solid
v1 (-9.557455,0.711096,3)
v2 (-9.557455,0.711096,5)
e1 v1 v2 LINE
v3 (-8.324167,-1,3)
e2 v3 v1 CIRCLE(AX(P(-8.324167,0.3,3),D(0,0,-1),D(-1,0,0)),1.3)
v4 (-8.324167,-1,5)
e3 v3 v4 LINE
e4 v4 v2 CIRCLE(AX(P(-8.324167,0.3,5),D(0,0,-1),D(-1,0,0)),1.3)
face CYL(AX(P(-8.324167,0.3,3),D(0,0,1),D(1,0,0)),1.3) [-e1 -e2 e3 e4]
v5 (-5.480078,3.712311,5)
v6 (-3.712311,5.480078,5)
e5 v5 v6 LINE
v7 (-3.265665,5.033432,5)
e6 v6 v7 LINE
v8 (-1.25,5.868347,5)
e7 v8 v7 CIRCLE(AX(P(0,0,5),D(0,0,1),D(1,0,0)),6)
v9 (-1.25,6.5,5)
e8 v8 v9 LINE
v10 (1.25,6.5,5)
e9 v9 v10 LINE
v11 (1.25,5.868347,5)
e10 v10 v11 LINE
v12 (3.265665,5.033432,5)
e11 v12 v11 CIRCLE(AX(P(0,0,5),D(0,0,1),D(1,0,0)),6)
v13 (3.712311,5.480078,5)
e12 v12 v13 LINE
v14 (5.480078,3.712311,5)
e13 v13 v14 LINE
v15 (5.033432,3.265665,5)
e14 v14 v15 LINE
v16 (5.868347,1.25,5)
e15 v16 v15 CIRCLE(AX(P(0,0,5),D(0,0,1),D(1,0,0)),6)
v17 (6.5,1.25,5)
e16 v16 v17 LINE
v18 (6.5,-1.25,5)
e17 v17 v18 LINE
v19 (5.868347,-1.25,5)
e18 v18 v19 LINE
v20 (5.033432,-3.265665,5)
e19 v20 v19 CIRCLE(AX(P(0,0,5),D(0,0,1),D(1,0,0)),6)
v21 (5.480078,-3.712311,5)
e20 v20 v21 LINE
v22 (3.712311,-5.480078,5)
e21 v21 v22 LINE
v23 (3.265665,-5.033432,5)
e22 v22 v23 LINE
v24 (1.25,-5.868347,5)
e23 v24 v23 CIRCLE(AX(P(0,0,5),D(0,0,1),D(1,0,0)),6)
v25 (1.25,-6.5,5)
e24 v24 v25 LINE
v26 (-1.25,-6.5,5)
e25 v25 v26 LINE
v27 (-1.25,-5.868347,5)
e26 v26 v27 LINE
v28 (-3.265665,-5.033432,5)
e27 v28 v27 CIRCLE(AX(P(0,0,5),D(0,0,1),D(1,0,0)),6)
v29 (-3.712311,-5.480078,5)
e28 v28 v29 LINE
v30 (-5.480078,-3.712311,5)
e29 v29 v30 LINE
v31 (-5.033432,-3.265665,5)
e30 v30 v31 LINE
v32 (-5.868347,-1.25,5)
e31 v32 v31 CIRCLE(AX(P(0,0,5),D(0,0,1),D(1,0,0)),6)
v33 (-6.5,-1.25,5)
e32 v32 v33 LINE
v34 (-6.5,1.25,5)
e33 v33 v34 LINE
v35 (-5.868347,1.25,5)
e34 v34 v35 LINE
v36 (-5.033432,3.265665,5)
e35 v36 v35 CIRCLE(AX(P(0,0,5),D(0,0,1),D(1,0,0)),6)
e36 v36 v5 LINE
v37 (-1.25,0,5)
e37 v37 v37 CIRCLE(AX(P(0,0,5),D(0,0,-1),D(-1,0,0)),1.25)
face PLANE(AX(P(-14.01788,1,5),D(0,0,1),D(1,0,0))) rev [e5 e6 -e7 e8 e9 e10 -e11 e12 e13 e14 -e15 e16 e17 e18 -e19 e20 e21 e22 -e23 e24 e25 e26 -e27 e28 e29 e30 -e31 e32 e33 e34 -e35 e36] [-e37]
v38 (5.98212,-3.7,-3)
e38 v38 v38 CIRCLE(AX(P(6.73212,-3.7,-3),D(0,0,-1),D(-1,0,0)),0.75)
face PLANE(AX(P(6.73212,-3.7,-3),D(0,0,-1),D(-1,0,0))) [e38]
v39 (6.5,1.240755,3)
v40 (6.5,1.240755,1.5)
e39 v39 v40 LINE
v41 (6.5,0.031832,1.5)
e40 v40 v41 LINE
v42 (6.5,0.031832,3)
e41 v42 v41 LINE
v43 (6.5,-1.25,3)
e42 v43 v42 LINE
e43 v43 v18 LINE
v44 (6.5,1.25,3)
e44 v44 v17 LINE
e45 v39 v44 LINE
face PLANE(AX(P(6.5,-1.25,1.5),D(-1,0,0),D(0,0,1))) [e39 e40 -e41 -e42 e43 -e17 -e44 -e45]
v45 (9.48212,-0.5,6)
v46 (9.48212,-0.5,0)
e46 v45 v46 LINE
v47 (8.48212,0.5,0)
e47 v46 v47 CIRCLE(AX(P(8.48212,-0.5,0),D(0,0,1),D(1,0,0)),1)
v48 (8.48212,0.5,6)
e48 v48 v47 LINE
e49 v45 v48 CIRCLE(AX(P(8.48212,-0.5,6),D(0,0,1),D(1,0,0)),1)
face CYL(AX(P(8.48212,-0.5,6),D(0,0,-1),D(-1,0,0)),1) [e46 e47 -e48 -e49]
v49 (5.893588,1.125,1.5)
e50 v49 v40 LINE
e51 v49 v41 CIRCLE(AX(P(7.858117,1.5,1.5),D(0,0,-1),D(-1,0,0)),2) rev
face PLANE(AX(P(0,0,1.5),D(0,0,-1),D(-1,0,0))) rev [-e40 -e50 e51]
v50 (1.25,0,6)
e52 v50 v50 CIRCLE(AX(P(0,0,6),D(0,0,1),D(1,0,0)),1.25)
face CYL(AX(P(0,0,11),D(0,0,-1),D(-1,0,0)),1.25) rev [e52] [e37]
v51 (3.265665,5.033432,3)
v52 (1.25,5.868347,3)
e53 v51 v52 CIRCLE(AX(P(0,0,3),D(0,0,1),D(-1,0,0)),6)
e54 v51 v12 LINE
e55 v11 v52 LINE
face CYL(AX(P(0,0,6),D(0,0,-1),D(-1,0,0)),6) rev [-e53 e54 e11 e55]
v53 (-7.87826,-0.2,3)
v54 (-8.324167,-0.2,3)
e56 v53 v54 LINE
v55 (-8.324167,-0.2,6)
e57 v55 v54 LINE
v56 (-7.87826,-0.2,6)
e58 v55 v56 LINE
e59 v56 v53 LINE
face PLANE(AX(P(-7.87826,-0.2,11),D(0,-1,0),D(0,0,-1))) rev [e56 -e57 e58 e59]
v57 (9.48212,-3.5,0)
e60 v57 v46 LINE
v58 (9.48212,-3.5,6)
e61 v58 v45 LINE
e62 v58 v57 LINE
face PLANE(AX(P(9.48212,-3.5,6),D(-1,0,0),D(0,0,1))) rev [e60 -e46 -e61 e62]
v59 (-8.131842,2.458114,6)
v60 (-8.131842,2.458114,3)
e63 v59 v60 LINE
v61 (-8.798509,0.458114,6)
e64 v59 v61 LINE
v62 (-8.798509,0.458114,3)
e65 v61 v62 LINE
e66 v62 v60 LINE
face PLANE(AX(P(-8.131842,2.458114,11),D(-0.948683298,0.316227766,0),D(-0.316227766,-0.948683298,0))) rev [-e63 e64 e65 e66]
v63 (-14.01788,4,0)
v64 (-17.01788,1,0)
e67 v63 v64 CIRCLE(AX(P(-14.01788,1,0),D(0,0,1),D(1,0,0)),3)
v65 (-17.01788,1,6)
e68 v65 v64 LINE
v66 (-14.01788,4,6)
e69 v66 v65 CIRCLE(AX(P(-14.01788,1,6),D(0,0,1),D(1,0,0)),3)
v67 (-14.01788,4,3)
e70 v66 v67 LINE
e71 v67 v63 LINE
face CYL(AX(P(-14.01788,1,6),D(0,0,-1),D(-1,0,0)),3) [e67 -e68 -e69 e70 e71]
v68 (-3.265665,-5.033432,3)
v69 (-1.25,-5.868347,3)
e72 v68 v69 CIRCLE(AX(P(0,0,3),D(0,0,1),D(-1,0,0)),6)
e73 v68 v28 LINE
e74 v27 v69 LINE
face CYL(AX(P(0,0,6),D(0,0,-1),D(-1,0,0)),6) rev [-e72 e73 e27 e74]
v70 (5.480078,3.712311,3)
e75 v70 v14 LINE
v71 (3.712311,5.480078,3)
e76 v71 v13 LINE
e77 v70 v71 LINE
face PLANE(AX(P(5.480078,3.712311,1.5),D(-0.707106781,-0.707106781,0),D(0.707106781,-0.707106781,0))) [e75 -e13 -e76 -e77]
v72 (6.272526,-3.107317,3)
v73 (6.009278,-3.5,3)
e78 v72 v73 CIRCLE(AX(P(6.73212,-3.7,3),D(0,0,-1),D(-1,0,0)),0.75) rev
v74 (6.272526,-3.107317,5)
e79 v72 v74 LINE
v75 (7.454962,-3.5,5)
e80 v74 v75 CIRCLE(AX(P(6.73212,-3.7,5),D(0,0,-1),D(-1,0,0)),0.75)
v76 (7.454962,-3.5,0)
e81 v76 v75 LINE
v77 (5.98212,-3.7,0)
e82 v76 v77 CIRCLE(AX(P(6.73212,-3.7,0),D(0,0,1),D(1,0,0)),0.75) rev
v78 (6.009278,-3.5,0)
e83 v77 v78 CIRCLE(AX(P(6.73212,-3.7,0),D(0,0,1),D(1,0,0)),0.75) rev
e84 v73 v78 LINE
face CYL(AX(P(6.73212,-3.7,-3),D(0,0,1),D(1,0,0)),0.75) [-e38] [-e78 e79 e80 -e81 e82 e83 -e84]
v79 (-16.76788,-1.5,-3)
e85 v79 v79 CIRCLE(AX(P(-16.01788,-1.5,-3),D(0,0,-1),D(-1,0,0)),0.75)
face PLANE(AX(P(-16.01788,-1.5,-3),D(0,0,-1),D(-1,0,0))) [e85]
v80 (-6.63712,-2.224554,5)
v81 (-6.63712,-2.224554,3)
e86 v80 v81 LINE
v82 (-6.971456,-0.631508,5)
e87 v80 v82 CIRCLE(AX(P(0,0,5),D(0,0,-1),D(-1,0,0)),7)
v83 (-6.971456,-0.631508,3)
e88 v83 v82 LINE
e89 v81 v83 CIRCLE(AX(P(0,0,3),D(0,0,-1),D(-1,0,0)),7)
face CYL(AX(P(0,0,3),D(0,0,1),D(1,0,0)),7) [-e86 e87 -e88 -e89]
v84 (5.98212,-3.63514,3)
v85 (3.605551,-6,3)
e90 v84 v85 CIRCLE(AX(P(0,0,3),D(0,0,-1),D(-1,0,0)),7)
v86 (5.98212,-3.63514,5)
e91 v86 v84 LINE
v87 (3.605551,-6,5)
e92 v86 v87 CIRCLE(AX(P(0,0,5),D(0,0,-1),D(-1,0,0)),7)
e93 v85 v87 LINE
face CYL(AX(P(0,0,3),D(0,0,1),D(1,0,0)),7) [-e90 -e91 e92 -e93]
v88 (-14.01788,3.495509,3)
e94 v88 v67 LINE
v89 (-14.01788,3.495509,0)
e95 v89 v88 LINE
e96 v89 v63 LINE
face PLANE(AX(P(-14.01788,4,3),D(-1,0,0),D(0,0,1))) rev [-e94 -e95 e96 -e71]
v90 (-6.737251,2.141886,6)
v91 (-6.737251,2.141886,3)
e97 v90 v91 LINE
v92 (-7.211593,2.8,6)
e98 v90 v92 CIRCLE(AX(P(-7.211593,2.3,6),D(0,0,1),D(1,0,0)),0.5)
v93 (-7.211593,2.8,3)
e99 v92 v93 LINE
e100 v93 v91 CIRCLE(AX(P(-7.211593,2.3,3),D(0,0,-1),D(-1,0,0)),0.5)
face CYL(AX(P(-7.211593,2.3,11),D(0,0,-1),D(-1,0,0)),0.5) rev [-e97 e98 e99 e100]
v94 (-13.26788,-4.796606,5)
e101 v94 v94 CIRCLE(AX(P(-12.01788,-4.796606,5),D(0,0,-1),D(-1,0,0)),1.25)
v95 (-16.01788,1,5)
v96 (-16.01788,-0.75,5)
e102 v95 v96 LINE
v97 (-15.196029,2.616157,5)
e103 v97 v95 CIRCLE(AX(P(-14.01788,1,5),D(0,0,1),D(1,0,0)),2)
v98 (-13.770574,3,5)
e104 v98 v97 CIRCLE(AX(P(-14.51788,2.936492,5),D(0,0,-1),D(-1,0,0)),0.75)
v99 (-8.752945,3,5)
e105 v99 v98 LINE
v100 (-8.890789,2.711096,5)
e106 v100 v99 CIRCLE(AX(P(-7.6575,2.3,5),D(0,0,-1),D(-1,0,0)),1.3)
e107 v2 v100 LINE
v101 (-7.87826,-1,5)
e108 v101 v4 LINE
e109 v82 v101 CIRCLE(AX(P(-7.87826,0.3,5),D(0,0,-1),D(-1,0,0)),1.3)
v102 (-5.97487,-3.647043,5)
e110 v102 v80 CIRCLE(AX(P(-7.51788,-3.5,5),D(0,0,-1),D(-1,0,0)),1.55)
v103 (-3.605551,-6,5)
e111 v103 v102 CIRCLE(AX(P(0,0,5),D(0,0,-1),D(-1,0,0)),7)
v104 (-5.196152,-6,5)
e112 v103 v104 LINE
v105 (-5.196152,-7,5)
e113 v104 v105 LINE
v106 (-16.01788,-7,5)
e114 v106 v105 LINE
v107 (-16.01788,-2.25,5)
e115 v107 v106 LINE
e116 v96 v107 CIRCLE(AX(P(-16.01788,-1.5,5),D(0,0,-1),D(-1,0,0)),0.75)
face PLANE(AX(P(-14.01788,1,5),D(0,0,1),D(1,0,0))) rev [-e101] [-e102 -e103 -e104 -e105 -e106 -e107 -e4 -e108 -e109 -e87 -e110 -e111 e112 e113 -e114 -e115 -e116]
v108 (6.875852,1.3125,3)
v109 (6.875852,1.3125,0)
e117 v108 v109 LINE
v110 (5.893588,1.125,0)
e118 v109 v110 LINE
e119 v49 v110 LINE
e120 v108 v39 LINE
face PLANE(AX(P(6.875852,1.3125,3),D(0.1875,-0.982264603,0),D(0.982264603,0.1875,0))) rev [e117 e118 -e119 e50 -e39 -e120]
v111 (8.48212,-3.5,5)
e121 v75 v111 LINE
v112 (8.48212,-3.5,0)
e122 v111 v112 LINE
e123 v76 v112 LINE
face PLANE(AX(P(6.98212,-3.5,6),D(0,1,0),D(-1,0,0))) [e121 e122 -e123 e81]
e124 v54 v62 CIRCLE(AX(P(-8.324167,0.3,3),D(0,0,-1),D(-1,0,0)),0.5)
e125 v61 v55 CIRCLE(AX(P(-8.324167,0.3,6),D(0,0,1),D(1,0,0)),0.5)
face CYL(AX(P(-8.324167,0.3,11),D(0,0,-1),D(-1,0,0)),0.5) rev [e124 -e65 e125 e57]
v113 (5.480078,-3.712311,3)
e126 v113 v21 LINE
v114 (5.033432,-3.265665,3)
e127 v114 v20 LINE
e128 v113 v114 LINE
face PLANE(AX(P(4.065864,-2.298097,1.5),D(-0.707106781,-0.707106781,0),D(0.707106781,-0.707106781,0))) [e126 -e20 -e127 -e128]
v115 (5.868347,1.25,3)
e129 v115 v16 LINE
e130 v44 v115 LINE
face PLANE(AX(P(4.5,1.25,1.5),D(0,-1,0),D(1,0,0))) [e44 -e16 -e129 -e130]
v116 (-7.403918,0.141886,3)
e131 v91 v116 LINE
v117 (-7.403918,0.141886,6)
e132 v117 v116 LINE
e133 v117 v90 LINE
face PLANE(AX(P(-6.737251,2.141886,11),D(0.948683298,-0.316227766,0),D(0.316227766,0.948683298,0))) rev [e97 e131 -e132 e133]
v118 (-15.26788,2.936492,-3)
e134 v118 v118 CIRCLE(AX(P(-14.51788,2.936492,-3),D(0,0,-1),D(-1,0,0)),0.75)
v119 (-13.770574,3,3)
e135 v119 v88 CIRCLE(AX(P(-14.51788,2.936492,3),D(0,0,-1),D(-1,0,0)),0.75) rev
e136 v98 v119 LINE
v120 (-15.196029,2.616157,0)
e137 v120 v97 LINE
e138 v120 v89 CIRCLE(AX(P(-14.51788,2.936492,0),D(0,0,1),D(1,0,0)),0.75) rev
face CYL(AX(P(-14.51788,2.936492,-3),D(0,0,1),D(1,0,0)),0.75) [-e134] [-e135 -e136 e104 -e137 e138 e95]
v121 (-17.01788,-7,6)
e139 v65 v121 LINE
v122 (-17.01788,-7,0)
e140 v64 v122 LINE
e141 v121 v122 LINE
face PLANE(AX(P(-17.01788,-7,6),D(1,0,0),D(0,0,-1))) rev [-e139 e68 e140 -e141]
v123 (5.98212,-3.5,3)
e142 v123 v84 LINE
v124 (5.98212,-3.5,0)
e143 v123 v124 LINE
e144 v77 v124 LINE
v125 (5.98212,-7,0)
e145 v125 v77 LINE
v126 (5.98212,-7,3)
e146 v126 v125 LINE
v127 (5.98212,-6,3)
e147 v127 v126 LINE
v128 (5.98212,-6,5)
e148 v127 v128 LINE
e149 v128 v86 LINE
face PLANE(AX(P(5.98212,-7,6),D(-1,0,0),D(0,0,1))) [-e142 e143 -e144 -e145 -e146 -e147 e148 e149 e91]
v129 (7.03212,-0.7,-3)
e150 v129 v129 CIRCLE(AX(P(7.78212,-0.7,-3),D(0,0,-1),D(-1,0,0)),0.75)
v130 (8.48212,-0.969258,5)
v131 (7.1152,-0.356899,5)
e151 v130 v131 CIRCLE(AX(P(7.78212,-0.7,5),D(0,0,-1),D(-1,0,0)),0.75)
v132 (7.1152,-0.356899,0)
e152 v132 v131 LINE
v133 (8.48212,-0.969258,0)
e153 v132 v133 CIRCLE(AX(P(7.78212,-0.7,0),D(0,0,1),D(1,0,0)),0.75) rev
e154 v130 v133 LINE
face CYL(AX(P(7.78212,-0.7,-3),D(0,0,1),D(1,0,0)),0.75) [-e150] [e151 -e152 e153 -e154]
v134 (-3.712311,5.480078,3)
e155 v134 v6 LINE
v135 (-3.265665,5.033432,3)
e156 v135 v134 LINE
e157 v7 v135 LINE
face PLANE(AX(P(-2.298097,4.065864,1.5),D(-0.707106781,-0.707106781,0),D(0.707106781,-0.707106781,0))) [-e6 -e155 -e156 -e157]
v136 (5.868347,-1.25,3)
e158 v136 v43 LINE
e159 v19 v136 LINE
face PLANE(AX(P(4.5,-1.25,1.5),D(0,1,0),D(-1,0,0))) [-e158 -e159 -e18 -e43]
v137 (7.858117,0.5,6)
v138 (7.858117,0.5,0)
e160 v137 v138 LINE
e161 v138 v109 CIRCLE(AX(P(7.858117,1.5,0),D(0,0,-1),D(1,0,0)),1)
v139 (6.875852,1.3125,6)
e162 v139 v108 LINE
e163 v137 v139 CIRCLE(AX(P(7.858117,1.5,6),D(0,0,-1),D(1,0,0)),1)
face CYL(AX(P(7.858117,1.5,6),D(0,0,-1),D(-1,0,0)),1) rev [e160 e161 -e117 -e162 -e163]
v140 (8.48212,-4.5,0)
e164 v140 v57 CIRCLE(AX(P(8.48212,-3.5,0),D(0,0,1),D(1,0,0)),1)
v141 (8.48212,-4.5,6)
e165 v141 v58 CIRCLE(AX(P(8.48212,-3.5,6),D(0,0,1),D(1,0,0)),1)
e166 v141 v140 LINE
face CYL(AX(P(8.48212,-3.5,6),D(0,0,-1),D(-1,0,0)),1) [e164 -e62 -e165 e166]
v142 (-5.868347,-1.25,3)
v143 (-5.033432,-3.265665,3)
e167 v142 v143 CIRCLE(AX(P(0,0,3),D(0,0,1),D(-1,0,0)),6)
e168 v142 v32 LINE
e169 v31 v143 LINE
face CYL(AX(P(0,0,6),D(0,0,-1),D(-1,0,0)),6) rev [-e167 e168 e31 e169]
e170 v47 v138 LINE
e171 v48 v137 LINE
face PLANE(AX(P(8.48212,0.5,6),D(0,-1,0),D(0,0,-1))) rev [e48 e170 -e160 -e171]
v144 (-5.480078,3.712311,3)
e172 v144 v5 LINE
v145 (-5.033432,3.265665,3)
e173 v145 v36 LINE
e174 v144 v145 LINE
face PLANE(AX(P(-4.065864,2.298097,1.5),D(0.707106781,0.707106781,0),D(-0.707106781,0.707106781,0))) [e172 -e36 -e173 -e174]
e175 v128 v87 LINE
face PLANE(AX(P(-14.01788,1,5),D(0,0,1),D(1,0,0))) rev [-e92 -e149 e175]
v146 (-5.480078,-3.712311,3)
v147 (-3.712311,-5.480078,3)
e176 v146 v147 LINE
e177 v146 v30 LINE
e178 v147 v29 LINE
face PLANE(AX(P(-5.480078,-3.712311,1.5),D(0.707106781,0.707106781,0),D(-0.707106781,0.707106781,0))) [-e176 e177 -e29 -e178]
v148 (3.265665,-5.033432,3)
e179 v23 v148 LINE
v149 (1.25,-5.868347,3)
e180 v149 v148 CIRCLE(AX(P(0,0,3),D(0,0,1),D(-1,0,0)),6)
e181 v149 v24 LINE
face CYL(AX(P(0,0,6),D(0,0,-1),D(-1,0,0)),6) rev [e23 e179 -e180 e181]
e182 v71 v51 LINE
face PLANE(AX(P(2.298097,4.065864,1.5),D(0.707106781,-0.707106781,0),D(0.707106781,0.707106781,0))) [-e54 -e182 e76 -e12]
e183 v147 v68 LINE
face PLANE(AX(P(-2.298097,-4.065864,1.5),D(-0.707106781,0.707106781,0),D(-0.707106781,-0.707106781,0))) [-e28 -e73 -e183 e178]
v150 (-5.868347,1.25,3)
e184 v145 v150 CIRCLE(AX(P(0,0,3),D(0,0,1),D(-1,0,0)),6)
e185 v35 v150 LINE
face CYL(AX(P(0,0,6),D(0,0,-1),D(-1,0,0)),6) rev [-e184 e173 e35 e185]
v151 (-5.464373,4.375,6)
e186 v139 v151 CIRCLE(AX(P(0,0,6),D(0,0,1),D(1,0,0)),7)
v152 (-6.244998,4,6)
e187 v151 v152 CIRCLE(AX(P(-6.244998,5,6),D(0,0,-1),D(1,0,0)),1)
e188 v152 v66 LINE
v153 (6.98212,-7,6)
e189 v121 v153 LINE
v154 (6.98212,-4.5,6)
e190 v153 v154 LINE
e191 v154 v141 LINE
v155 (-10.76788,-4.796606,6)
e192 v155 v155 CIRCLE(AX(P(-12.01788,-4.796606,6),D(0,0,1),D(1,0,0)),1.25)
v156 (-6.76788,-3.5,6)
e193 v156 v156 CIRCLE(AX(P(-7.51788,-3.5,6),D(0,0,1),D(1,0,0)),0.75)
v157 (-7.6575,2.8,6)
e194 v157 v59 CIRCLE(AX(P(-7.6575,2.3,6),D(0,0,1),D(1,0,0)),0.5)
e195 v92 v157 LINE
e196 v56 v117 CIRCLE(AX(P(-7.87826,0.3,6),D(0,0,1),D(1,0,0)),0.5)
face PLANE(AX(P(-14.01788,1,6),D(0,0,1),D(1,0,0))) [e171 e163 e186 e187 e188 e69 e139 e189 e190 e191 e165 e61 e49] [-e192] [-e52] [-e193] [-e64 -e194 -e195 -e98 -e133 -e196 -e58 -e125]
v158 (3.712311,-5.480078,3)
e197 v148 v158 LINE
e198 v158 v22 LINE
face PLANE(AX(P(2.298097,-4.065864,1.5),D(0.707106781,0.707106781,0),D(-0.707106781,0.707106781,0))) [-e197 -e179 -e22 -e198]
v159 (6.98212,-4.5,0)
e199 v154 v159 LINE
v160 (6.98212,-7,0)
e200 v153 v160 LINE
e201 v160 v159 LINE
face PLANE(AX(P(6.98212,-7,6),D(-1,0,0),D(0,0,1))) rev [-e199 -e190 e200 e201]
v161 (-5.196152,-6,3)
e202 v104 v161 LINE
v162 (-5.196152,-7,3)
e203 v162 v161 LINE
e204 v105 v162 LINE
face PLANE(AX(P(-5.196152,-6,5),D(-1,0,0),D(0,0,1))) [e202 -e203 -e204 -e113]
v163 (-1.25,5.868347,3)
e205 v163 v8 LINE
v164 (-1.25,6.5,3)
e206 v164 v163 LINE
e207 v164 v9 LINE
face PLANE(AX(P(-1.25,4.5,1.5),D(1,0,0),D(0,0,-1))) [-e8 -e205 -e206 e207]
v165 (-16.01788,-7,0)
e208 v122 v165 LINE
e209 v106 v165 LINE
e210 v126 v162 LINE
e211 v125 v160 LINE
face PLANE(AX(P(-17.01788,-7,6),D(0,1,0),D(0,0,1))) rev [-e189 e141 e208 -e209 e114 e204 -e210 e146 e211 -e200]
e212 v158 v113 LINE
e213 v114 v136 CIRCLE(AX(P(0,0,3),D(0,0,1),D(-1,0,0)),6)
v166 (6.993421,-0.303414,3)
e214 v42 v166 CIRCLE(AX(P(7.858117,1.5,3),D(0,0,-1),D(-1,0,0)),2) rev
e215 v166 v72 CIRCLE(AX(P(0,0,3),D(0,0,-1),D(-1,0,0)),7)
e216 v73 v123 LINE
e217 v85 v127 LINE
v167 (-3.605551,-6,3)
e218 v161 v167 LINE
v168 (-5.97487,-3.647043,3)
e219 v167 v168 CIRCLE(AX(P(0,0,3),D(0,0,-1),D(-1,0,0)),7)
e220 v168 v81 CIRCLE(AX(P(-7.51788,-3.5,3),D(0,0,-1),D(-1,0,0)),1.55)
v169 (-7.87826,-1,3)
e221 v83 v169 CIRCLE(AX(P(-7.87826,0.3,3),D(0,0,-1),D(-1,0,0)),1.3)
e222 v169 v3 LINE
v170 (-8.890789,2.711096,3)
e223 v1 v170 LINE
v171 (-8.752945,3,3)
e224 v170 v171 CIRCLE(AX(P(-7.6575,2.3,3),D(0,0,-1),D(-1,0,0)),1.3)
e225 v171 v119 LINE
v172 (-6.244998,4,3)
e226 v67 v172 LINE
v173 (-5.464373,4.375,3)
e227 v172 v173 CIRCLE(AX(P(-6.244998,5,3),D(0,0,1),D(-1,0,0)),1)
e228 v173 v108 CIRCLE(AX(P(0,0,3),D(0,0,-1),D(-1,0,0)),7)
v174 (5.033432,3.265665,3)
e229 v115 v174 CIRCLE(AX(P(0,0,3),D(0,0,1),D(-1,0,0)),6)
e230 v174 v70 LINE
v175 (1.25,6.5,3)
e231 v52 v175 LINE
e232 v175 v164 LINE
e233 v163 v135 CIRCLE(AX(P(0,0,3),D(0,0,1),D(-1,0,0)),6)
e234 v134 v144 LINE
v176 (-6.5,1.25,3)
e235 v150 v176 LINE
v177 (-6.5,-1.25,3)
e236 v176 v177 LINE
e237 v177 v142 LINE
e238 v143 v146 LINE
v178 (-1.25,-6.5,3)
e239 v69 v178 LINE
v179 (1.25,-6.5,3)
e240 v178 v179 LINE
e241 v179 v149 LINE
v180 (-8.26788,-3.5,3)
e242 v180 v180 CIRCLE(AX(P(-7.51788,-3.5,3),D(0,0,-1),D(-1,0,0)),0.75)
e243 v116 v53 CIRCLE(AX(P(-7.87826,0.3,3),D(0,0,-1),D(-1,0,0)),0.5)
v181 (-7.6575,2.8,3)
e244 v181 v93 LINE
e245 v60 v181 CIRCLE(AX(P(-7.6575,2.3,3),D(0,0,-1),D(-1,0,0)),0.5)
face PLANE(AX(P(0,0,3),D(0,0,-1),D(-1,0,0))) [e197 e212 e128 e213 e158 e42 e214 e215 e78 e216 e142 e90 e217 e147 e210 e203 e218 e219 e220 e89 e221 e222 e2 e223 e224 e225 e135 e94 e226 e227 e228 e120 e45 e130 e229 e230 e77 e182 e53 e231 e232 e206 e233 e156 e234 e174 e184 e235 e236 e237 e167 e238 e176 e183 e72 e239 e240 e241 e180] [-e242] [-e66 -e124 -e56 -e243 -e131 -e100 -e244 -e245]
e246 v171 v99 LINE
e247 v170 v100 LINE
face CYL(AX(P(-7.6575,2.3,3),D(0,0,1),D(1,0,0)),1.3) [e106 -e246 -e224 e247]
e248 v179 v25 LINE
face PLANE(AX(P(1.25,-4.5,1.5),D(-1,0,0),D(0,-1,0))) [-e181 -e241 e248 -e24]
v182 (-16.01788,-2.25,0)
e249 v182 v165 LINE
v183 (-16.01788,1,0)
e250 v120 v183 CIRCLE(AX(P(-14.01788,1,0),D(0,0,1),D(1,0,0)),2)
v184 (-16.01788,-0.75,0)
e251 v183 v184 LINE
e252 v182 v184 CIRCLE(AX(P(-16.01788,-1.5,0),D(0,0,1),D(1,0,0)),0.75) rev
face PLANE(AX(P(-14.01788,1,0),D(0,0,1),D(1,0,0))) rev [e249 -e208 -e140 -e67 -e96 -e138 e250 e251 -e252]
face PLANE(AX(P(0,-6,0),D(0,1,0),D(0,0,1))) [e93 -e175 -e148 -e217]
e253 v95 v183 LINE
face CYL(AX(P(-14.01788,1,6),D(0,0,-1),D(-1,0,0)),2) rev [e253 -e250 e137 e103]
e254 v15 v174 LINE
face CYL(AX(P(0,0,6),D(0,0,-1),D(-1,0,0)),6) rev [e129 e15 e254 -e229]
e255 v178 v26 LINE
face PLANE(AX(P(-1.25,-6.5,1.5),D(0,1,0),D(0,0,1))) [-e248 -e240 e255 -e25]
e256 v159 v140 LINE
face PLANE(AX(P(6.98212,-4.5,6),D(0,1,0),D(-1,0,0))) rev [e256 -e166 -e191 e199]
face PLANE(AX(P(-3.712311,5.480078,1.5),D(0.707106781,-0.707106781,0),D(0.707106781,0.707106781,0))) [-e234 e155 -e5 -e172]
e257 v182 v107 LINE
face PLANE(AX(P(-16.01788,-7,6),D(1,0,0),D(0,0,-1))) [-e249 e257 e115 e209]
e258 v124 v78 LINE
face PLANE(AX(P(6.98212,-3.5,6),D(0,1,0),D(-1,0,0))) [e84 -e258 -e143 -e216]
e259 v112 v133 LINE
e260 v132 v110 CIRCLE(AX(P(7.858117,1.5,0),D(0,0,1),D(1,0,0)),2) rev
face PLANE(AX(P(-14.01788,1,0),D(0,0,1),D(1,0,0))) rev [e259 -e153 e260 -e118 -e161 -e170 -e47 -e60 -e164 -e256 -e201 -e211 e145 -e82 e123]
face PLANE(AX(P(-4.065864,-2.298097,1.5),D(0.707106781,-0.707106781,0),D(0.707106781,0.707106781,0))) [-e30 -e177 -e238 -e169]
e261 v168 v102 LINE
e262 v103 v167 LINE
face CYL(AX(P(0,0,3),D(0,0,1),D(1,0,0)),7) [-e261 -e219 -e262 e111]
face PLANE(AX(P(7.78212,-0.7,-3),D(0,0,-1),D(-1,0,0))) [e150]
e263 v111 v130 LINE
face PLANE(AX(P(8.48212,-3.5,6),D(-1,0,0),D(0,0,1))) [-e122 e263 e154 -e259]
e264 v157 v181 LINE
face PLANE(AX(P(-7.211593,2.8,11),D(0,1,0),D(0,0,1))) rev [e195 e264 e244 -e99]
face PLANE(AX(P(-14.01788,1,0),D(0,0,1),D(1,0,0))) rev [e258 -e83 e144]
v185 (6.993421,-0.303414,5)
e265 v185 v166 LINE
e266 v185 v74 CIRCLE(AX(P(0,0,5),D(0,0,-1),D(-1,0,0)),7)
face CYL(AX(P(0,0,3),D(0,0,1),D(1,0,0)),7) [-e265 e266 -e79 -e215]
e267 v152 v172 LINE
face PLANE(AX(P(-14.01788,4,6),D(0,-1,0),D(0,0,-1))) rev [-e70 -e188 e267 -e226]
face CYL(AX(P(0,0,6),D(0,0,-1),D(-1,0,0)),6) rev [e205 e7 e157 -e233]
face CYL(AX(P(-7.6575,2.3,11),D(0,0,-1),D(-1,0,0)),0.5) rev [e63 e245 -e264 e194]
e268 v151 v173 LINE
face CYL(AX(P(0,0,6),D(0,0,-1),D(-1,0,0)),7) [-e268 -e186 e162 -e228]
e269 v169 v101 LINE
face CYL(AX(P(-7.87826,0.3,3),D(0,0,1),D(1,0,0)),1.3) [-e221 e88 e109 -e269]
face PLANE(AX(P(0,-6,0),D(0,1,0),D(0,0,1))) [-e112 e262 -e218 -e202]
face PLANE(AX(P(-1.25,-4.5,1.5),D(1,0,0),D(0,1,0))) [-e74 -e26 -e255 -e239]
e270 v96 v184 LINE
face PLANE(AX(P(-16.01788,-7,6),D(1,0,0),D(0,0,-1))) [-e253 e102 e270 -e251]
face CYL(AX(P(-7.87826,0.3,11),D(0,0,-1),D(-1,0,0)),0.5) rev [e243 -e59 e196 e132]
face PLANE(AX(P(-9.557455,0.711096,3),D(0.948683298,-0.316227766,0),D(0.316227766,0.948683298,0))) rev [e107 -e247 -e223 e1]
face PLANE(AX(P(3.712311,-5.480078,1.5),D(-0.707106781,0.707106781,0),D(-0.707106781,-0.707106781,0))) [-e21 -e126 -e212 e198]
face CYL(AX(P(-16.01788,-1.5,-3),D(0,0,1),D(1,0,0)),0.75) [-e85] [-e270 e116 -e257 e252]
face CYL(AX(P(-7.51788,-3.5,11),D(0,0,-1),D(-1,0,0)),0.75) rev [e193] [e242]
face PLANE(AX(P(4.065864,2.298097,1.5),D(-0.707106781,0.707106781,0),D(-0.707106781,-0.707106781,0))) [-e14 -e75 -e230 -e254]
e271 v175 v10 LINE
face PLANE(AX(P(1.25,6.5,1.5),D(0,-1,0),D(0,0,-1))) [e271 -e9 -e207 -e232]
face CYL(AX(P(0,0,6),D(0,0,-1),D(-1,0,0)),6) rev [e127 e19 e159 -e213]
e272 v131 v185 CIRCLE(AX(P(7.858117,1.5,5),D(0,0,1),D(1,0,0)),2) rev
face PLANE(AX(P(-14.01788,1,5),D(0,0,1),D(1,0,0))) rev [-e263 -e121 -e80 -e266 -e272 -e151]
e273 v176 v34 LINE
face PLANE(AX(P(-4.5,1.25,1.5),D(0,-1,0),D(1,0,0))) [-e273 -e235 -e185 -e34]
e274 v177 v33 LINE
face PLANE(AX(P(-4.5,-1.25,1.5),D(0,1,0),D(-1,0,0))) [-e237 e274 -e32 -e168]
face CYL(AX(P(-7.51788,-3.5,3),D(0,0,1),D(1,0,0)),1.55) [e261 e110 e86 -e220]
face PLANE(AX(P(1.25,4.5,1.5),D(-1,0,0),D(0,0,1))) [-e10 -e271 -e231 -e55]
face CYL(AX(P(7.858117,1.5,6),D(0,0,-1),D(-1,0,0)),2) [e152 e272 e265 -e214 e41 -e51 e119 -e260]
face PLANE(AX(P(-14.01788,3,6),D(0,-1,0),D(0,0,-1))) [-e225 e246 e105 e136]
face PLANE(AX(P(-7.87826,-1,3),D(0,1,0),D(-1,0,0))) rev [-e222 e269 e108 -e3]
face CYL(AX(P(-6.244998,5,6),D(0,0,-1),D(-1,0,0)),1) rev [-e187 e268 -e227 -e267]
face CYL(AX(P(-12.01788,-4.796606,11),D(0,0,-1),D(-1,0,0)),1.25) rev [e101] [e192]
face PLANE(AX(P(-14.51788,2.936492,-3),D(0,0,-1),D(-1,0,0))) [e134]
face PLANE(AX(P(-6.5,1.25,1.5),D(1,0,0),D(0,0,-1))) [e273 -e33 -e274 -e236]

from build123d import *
from build123d.topology import SkipClean

# Parameters (mm, degrees)
BOSS_EXTRUDE1_DEPTH = 6
SHELL1_DEPTH        = 5
SKETCH2_R           = 1.25
SKETCH2_R_2         = 0.75
CUT_EXTRUDE1_DEPTH  = 6
SKETCH3_W           = 11.178272445
SKETCH3_H           = 3
BOSS_EXTRUDE2_DEPTH = 1
CUT_EXTRUDE2_DEPTH  = 3
BOSS_EXTRUDE4_START = 2
SKETCH7_R           = 7
SKETCH7_R_2         = 6
BOSS_EXTRUDE4_DEPTH = 2
BOSS_EXTRUDE5_START = 2
SKETCH8_R           = 1.55
SKETCH8_R_2         = 0.75
BOSS_EXTRUDE5_DEPTH = 2
SKETCH10_R          = 0.75
BOSS_EXTRUDE6_DEPTH = 8
SKETCH17_W          = 11.178272445
SKETCH17_H          = 1
CUT_EXTRUDE5_DEPTH  = 1
SKETCH18_W          = 2.5
SKETCH18_H          = 2
SKETCH18_W_2        = 2
SKETCH18_H_2        = 2.5
CUT_EXTRUDE7_DEPTH  = 3.5


# Read off the part's stored shape, not the designer's step: Shell1
with BuildPart() as part:
    # Sketch1 → Boss-Extrude1 (new body)
    with BuildSketch(Plane.XY):
        with BuildLine():
            Line((-17.017879978, -7), (6.982120022, -7))
            Line((6.982120022, -7), (6.982120022, -4.5))
            Line((6.982120022, -4.5), (8.482120022, -4.5))
            ThreePointArc((8.482120022, -4.5), (9.189226803, -4.207106781), (9.482120022, -3.5))
            Line((9.482120022, -3.5), (9.482120022, -0.5))
            ThreePointArc((9.482120022, -0.5), (9.189226803, 0.207106781), (8.482120022, 0.5))
            Line((8.482120022, 0.5), (7.858116823, 0.5))
            ThreePointArc((7.858116823, 0.5), (7.220739384, 0.72944825), (6.87585222, 1.3125))
            ThreePointArc((6.87585222, 1.3125), (1.68605895, 6.793909421), (-5.464373249, 4.375))
            ThreePointArc((-5.464373249, 4.375), (-5.811985297, 4.098612181), (-6.244997998, 4))
            Line((-6.244997998, 4), (-14.017879978, 4))
            ThreePointArc((-14.017879978, 4), (-16.139200322, 3.121320344), (-17.017879978, 1))
            Line((-17.017879978, 1), (-17.017879978, -7))
        make_face()
    extrude(amount=BOSS_EXTRUDE1_DEPTH)

    # Shell1 outline → Shell1 (cut)
    with BuildSketch(Plane.XY):
        with BuildLine():
            Line((-16.017879978, 1), (-16.017879978, -7))
            Line((-16.017879978, -7), (5.982120022, -7))
            Line((5.982120022, -7), (5.982120022, -3.5))
            Line((5.982120022, -3.5), (8.482120022, -3.5))
            Line((8.482120022, -3.5), (8.482120022, -0.5))
            Line((8.482120022, -0.5), (7.858116823, -0.5))
            ThreePointArc((7.858116823, -0.5), (6.583361944, -0.041103501), (5.893587617, 1.125))
            ThreePointArc((5.893587617, 1.125), (1.445193386, 5.823350932), (-4.683748499, 3.75))
            ThreePointArc((-4.683748499, 3.75), (-5.378972594, 3.197224362), (-6.244997998, 3))
            Line((-6.244997998, 3), (-14.017879978, 3))
            ThreePointArc((-14.017879978, 3), (-15.43209354, 2.414213562), (-16.017879978, 1))
        make_face()
    extrude(amount=SHELL1_DEPTH, mode=Mode.SUBTRACT)

    # Sketch2 → Cut-Extrude1 (cut)
    with BuildSketch(Plane(origin=(0, 0, 5), x_dir=(-1, 0, 0), z_dir=(0, 0, -1))):
        Circle(SKETCH2_R)
        with Locations((7.517879978, -3.5)):
            Circle(SKETCH2_R_2)
        with Locations((12.017879978, -4.796605976)):
            Circle(SKETCH2_R)
        with BuildLine():
            Line((7.211592921, 2.8), (7.657500368, 2.8))
            ThreePointArc((7.657500368, 2.8), (7.94985551, 2.705621093), (8.131842017, 2.458113883))
            Line((8.131842017, 2.458113883), (8.798508684, 0.458113883))
            ThreePointArc((8.798508684, 0.458113883), (8.729788127, 0.007644858), (8.324167035, -0.2))
            Line((8.324167035, -0.2), (7.878259588, -0.2))
            ThreePointArc((7.878259588, -0.2), (7.585904446, -0.105621093), (7.403917939, 0.141886117))
            Line((7.403917939, 0.141886117), (6.737251272, 2.141886117))
            ThreePointArc((6.737251272, 2.141886117), (6.805971829, 2.592355142), (7.211592921, 2.8))
        make_face()
    extrude(amount=-CUT_EXTRUDE1_DEPTH, mode=Mode.SUBTRACT)

    # Sketch3 → Boss-Extrude2 (add)
    with BuildSketch(Plane.XZ.offset(7)):
        with Locations((0.3929838, 3.5)):
            Rectangle(SKETCH3_W, SKETCH3_H)
    extrude(amount=-BOSS_EXTRUDE2_DEPTH)

    # Sketch6 → Cut-Extrude2 (cut)
    with BuildSketch(Plane(origin=(0, 0, 0), x_dir=(-1, 0, 0), z_dir=(0, 0, -1))):
        with BuildLine():
            Line((6.244997998, 4), (14.017879978, 4))
            Line((14.017879978, 4), (14.017879978, 3))
            Line((14.017879978, 3), (6.244997998, 3))
            ThreePointArc((6.244997998, 3), (5.378972595, 3.197224362), (4.683748499, 3.75))
            ThreePointArc((4.683748499, 3.75), (-1.445193386, 5.823350932), (-5.893587617, 1.125))
            Line((-5.893587617, 1.125), (-6.87585222, 1.3125))
            ThreePointArc((-6.87585222, 1.3125), (-1.68605895, 6.793909421), (5.464373249, 4.375))
            ThreePointArc((5.464373249, 4.375), (5.811985297, 4.098612181), (6.244997998, 4))
        make_face()
    extrude(amount=-CUT_EXTRUDE2_DEPTH, mode=Mode.SUBTRACT)

    # Sketch7 → Boss-Extrude4 (add)
    with SkipClean():  # the faces are left unmerged after this step: merging them gives an invalid solid
        with BuildSketch(Plane(origin=(0, 0, 5), x_dir=(-1, 0, 0), z_dir=(0, 0, -1)).offset(BOSS_EXTRUDE4_START)):
            Circle(SKETCH7_R)
            with Locations(Location((0, 0, 0), (0, 0, 270))):
                Circle(SKETCH7_R_2, mode=Mode.SUBTRACT)
        extrude(amount=-BOSS_EXTRUDE4_DEPTH)

    # Sketch8 → Boss-Extrude5 (add)
    # profile 1 of 2: a face of its own
    with SkipClean():  # the faces are left unmerged after this step: merging them gives an invalid solid
        with BuildSketch(Plane(origin=(0, 0, 5), x_dir=(-1, 0, 0), z_dir=(0, 0, -1)).offset(BOSS_EXTRUDE5_START)):
            with Locations((7.517879978, -3.5)):
                Circle(SKETCH8_R)
            with Locations((7.517879978, -3.5)):
                Circle(SKETCH8_R_2, mode=Mode.SUBTRACT)
        # profile 2 of 2: a face of its own
        with BuildSketch(Plane(origin=(0, 0, 5), x_dir=(-1, 0, 0), z_dir=(0, 0, -1)).offset(BOSS_EXTRUDE5_START)):
            with BuildLine():
                Line((5.978304634, 1.888903904), (6.644971301, -0.111096096))
                ThreePointArc((6.644971301, -0.111096096), (7.118136218, -0.754614841), (7.878259588, -1))
                Line((7.878259588, -1), (8.324167035, -1))
                ThreePointArc((8.324167035, -1), (9.378781875, -0.46012337), (9.557455322, 0.711096096))
                Line((9.557455322, 0.711096096), (8.890788656, 2.711096096))
                ThreePointArc((8.890788656, 2.711096096), (8.417623738, 3.354614841), (7.657500368, 3.6))
                Line((7.657500368, 3.6), (7.211592921, 3.6))
                ThreePointArc((7.211592921, 3.6), (6.156978081, 3.06012337), (5.978304634, 1.888903904))
            make_face()
            with BuildLine():
                Line((7.657500368, 2.8), (7.211592921, 2.8))
                ThreePointArc((7.211592921, 2.8), (6.805971829, 2.592355142), (6.737251272, 2.141886117))
                Line((6.737251272, 2.141886117), (7.403917939, 0.141886117))
                ThreePointArc((7.403917939, 0.141886117), (7.585904446, -0.105621093), (7.878259588, -0.2))
                Line((7.878259588, -0.2), (8.324167035, -0.2))
                ThreePointArc((8.324167035, -0.2), (8.729788127, 0.007644858), (8.798508684, 0.458113883))
                Line((8.798508684, 0.458113883), (8.131842017, 2.458113883))
                ThreePointArc((8.131842017, 2.458113883), (7.94985551, 2.705621093), (7.657500368, 2.8))
            make_face(mode=Mode.SUBTRACT)
        extrude(amount=-BOSS_EXTRUDE5_DEPTH)

    # Sketch10 → Boss-Extrude6 (add)
    with SkipClean():  # the faces are left unmerged after this step: merging them gives an invalid solid
        with BuildSketch(Plane(origin=(0, 0, 5), x_dir=(-1, 0, 0), z_dir=(0, 0, -1))):
            with Locations(Location((-7.782120022, -0.7, 0), (0, 0, 201.039469781))):
                Circle(SKETCH10_R)
            with Locations((-6.732120022, -3.7)):
                Circle(SKETCH10_R)
            with Locations(Location((16.017879978, -1.5, 0), (0, 0, 90))):
                Circle(SKETCH10_R)
            with Locations(Location((14.517879978, 2.936491673, 0), (0, 0, 175.1425044))):
                Circle(SKETCH10_R)
        extrude(amount=BOSS_EXTRUDE6_DEPTH)

    # Sketch17 → Cut-Extrude5 (cut)
    with SkipClean():  # the faces are left unmerged after this step: merging them gives an invalid solid
        with BuildSketch(Plane(origin=(0, 0, 2), x_dir=(-1, 0, 0), z_dir=(0, 0, -1))):
            with Locations((-0.3929838, -6.5)):
                Rectangle(SKETCH17_W, SKETCH17_H)
        extrude(amount=-CUT_EXTRUDE5_DEPTH, mode=Mode.SUBTRACT)

    # Sketch18 → Cut-Extrude7 (cut)
    with BuildSketch(Plane(origin=(0, 0, 5), x_dir=(-1, 0, 0), z_dir=(0, 0, -1))):
        Polygon((2.298097039, 4.065863992), (3.712310601, 5.480077554), (5.480077554, 3.712310601), (4.065863992, 2.298097039), align=None)
        with Locations((0, 5.5)):
            Rectangle(SKETCH18_W, SKETCH18_H)
        with Locations((5.5, 0)):
            Rectangle(SKETCH18_W_2, SKETCH18_H_2)
        Polygon((4.065863992, -2.298097039), (5.480077554, -3.712310601), (3.712310601, -5.480077554), (2.298097039, -4.065863992), align=None)
        with Locations((0, -5.5)):
            Rectangle(SKETCH18_W, SKETCH18_H)
        Polygon((-2.298097039, -4.065863992), (-3.712310601, -5.480077554), (-5.480077554, -3.712310601), (-4.065863992, -2.298097039), align=None)
        with Locations((-5.5, 0)):
            Rectangle(SKETCH18_W_2, SKETCH18_H_2)
        Polygon((-4.065863992, 2.298097039), (-5.480077554, 3.712310601), (-3.712310601, 5.480077554), (-2.298097039, 4.065863992), align=None)
    extrude(amount=CUT_EXTRUDE7_DEPTH, mode=Mode.SUBTRACT)


solid = part.part
